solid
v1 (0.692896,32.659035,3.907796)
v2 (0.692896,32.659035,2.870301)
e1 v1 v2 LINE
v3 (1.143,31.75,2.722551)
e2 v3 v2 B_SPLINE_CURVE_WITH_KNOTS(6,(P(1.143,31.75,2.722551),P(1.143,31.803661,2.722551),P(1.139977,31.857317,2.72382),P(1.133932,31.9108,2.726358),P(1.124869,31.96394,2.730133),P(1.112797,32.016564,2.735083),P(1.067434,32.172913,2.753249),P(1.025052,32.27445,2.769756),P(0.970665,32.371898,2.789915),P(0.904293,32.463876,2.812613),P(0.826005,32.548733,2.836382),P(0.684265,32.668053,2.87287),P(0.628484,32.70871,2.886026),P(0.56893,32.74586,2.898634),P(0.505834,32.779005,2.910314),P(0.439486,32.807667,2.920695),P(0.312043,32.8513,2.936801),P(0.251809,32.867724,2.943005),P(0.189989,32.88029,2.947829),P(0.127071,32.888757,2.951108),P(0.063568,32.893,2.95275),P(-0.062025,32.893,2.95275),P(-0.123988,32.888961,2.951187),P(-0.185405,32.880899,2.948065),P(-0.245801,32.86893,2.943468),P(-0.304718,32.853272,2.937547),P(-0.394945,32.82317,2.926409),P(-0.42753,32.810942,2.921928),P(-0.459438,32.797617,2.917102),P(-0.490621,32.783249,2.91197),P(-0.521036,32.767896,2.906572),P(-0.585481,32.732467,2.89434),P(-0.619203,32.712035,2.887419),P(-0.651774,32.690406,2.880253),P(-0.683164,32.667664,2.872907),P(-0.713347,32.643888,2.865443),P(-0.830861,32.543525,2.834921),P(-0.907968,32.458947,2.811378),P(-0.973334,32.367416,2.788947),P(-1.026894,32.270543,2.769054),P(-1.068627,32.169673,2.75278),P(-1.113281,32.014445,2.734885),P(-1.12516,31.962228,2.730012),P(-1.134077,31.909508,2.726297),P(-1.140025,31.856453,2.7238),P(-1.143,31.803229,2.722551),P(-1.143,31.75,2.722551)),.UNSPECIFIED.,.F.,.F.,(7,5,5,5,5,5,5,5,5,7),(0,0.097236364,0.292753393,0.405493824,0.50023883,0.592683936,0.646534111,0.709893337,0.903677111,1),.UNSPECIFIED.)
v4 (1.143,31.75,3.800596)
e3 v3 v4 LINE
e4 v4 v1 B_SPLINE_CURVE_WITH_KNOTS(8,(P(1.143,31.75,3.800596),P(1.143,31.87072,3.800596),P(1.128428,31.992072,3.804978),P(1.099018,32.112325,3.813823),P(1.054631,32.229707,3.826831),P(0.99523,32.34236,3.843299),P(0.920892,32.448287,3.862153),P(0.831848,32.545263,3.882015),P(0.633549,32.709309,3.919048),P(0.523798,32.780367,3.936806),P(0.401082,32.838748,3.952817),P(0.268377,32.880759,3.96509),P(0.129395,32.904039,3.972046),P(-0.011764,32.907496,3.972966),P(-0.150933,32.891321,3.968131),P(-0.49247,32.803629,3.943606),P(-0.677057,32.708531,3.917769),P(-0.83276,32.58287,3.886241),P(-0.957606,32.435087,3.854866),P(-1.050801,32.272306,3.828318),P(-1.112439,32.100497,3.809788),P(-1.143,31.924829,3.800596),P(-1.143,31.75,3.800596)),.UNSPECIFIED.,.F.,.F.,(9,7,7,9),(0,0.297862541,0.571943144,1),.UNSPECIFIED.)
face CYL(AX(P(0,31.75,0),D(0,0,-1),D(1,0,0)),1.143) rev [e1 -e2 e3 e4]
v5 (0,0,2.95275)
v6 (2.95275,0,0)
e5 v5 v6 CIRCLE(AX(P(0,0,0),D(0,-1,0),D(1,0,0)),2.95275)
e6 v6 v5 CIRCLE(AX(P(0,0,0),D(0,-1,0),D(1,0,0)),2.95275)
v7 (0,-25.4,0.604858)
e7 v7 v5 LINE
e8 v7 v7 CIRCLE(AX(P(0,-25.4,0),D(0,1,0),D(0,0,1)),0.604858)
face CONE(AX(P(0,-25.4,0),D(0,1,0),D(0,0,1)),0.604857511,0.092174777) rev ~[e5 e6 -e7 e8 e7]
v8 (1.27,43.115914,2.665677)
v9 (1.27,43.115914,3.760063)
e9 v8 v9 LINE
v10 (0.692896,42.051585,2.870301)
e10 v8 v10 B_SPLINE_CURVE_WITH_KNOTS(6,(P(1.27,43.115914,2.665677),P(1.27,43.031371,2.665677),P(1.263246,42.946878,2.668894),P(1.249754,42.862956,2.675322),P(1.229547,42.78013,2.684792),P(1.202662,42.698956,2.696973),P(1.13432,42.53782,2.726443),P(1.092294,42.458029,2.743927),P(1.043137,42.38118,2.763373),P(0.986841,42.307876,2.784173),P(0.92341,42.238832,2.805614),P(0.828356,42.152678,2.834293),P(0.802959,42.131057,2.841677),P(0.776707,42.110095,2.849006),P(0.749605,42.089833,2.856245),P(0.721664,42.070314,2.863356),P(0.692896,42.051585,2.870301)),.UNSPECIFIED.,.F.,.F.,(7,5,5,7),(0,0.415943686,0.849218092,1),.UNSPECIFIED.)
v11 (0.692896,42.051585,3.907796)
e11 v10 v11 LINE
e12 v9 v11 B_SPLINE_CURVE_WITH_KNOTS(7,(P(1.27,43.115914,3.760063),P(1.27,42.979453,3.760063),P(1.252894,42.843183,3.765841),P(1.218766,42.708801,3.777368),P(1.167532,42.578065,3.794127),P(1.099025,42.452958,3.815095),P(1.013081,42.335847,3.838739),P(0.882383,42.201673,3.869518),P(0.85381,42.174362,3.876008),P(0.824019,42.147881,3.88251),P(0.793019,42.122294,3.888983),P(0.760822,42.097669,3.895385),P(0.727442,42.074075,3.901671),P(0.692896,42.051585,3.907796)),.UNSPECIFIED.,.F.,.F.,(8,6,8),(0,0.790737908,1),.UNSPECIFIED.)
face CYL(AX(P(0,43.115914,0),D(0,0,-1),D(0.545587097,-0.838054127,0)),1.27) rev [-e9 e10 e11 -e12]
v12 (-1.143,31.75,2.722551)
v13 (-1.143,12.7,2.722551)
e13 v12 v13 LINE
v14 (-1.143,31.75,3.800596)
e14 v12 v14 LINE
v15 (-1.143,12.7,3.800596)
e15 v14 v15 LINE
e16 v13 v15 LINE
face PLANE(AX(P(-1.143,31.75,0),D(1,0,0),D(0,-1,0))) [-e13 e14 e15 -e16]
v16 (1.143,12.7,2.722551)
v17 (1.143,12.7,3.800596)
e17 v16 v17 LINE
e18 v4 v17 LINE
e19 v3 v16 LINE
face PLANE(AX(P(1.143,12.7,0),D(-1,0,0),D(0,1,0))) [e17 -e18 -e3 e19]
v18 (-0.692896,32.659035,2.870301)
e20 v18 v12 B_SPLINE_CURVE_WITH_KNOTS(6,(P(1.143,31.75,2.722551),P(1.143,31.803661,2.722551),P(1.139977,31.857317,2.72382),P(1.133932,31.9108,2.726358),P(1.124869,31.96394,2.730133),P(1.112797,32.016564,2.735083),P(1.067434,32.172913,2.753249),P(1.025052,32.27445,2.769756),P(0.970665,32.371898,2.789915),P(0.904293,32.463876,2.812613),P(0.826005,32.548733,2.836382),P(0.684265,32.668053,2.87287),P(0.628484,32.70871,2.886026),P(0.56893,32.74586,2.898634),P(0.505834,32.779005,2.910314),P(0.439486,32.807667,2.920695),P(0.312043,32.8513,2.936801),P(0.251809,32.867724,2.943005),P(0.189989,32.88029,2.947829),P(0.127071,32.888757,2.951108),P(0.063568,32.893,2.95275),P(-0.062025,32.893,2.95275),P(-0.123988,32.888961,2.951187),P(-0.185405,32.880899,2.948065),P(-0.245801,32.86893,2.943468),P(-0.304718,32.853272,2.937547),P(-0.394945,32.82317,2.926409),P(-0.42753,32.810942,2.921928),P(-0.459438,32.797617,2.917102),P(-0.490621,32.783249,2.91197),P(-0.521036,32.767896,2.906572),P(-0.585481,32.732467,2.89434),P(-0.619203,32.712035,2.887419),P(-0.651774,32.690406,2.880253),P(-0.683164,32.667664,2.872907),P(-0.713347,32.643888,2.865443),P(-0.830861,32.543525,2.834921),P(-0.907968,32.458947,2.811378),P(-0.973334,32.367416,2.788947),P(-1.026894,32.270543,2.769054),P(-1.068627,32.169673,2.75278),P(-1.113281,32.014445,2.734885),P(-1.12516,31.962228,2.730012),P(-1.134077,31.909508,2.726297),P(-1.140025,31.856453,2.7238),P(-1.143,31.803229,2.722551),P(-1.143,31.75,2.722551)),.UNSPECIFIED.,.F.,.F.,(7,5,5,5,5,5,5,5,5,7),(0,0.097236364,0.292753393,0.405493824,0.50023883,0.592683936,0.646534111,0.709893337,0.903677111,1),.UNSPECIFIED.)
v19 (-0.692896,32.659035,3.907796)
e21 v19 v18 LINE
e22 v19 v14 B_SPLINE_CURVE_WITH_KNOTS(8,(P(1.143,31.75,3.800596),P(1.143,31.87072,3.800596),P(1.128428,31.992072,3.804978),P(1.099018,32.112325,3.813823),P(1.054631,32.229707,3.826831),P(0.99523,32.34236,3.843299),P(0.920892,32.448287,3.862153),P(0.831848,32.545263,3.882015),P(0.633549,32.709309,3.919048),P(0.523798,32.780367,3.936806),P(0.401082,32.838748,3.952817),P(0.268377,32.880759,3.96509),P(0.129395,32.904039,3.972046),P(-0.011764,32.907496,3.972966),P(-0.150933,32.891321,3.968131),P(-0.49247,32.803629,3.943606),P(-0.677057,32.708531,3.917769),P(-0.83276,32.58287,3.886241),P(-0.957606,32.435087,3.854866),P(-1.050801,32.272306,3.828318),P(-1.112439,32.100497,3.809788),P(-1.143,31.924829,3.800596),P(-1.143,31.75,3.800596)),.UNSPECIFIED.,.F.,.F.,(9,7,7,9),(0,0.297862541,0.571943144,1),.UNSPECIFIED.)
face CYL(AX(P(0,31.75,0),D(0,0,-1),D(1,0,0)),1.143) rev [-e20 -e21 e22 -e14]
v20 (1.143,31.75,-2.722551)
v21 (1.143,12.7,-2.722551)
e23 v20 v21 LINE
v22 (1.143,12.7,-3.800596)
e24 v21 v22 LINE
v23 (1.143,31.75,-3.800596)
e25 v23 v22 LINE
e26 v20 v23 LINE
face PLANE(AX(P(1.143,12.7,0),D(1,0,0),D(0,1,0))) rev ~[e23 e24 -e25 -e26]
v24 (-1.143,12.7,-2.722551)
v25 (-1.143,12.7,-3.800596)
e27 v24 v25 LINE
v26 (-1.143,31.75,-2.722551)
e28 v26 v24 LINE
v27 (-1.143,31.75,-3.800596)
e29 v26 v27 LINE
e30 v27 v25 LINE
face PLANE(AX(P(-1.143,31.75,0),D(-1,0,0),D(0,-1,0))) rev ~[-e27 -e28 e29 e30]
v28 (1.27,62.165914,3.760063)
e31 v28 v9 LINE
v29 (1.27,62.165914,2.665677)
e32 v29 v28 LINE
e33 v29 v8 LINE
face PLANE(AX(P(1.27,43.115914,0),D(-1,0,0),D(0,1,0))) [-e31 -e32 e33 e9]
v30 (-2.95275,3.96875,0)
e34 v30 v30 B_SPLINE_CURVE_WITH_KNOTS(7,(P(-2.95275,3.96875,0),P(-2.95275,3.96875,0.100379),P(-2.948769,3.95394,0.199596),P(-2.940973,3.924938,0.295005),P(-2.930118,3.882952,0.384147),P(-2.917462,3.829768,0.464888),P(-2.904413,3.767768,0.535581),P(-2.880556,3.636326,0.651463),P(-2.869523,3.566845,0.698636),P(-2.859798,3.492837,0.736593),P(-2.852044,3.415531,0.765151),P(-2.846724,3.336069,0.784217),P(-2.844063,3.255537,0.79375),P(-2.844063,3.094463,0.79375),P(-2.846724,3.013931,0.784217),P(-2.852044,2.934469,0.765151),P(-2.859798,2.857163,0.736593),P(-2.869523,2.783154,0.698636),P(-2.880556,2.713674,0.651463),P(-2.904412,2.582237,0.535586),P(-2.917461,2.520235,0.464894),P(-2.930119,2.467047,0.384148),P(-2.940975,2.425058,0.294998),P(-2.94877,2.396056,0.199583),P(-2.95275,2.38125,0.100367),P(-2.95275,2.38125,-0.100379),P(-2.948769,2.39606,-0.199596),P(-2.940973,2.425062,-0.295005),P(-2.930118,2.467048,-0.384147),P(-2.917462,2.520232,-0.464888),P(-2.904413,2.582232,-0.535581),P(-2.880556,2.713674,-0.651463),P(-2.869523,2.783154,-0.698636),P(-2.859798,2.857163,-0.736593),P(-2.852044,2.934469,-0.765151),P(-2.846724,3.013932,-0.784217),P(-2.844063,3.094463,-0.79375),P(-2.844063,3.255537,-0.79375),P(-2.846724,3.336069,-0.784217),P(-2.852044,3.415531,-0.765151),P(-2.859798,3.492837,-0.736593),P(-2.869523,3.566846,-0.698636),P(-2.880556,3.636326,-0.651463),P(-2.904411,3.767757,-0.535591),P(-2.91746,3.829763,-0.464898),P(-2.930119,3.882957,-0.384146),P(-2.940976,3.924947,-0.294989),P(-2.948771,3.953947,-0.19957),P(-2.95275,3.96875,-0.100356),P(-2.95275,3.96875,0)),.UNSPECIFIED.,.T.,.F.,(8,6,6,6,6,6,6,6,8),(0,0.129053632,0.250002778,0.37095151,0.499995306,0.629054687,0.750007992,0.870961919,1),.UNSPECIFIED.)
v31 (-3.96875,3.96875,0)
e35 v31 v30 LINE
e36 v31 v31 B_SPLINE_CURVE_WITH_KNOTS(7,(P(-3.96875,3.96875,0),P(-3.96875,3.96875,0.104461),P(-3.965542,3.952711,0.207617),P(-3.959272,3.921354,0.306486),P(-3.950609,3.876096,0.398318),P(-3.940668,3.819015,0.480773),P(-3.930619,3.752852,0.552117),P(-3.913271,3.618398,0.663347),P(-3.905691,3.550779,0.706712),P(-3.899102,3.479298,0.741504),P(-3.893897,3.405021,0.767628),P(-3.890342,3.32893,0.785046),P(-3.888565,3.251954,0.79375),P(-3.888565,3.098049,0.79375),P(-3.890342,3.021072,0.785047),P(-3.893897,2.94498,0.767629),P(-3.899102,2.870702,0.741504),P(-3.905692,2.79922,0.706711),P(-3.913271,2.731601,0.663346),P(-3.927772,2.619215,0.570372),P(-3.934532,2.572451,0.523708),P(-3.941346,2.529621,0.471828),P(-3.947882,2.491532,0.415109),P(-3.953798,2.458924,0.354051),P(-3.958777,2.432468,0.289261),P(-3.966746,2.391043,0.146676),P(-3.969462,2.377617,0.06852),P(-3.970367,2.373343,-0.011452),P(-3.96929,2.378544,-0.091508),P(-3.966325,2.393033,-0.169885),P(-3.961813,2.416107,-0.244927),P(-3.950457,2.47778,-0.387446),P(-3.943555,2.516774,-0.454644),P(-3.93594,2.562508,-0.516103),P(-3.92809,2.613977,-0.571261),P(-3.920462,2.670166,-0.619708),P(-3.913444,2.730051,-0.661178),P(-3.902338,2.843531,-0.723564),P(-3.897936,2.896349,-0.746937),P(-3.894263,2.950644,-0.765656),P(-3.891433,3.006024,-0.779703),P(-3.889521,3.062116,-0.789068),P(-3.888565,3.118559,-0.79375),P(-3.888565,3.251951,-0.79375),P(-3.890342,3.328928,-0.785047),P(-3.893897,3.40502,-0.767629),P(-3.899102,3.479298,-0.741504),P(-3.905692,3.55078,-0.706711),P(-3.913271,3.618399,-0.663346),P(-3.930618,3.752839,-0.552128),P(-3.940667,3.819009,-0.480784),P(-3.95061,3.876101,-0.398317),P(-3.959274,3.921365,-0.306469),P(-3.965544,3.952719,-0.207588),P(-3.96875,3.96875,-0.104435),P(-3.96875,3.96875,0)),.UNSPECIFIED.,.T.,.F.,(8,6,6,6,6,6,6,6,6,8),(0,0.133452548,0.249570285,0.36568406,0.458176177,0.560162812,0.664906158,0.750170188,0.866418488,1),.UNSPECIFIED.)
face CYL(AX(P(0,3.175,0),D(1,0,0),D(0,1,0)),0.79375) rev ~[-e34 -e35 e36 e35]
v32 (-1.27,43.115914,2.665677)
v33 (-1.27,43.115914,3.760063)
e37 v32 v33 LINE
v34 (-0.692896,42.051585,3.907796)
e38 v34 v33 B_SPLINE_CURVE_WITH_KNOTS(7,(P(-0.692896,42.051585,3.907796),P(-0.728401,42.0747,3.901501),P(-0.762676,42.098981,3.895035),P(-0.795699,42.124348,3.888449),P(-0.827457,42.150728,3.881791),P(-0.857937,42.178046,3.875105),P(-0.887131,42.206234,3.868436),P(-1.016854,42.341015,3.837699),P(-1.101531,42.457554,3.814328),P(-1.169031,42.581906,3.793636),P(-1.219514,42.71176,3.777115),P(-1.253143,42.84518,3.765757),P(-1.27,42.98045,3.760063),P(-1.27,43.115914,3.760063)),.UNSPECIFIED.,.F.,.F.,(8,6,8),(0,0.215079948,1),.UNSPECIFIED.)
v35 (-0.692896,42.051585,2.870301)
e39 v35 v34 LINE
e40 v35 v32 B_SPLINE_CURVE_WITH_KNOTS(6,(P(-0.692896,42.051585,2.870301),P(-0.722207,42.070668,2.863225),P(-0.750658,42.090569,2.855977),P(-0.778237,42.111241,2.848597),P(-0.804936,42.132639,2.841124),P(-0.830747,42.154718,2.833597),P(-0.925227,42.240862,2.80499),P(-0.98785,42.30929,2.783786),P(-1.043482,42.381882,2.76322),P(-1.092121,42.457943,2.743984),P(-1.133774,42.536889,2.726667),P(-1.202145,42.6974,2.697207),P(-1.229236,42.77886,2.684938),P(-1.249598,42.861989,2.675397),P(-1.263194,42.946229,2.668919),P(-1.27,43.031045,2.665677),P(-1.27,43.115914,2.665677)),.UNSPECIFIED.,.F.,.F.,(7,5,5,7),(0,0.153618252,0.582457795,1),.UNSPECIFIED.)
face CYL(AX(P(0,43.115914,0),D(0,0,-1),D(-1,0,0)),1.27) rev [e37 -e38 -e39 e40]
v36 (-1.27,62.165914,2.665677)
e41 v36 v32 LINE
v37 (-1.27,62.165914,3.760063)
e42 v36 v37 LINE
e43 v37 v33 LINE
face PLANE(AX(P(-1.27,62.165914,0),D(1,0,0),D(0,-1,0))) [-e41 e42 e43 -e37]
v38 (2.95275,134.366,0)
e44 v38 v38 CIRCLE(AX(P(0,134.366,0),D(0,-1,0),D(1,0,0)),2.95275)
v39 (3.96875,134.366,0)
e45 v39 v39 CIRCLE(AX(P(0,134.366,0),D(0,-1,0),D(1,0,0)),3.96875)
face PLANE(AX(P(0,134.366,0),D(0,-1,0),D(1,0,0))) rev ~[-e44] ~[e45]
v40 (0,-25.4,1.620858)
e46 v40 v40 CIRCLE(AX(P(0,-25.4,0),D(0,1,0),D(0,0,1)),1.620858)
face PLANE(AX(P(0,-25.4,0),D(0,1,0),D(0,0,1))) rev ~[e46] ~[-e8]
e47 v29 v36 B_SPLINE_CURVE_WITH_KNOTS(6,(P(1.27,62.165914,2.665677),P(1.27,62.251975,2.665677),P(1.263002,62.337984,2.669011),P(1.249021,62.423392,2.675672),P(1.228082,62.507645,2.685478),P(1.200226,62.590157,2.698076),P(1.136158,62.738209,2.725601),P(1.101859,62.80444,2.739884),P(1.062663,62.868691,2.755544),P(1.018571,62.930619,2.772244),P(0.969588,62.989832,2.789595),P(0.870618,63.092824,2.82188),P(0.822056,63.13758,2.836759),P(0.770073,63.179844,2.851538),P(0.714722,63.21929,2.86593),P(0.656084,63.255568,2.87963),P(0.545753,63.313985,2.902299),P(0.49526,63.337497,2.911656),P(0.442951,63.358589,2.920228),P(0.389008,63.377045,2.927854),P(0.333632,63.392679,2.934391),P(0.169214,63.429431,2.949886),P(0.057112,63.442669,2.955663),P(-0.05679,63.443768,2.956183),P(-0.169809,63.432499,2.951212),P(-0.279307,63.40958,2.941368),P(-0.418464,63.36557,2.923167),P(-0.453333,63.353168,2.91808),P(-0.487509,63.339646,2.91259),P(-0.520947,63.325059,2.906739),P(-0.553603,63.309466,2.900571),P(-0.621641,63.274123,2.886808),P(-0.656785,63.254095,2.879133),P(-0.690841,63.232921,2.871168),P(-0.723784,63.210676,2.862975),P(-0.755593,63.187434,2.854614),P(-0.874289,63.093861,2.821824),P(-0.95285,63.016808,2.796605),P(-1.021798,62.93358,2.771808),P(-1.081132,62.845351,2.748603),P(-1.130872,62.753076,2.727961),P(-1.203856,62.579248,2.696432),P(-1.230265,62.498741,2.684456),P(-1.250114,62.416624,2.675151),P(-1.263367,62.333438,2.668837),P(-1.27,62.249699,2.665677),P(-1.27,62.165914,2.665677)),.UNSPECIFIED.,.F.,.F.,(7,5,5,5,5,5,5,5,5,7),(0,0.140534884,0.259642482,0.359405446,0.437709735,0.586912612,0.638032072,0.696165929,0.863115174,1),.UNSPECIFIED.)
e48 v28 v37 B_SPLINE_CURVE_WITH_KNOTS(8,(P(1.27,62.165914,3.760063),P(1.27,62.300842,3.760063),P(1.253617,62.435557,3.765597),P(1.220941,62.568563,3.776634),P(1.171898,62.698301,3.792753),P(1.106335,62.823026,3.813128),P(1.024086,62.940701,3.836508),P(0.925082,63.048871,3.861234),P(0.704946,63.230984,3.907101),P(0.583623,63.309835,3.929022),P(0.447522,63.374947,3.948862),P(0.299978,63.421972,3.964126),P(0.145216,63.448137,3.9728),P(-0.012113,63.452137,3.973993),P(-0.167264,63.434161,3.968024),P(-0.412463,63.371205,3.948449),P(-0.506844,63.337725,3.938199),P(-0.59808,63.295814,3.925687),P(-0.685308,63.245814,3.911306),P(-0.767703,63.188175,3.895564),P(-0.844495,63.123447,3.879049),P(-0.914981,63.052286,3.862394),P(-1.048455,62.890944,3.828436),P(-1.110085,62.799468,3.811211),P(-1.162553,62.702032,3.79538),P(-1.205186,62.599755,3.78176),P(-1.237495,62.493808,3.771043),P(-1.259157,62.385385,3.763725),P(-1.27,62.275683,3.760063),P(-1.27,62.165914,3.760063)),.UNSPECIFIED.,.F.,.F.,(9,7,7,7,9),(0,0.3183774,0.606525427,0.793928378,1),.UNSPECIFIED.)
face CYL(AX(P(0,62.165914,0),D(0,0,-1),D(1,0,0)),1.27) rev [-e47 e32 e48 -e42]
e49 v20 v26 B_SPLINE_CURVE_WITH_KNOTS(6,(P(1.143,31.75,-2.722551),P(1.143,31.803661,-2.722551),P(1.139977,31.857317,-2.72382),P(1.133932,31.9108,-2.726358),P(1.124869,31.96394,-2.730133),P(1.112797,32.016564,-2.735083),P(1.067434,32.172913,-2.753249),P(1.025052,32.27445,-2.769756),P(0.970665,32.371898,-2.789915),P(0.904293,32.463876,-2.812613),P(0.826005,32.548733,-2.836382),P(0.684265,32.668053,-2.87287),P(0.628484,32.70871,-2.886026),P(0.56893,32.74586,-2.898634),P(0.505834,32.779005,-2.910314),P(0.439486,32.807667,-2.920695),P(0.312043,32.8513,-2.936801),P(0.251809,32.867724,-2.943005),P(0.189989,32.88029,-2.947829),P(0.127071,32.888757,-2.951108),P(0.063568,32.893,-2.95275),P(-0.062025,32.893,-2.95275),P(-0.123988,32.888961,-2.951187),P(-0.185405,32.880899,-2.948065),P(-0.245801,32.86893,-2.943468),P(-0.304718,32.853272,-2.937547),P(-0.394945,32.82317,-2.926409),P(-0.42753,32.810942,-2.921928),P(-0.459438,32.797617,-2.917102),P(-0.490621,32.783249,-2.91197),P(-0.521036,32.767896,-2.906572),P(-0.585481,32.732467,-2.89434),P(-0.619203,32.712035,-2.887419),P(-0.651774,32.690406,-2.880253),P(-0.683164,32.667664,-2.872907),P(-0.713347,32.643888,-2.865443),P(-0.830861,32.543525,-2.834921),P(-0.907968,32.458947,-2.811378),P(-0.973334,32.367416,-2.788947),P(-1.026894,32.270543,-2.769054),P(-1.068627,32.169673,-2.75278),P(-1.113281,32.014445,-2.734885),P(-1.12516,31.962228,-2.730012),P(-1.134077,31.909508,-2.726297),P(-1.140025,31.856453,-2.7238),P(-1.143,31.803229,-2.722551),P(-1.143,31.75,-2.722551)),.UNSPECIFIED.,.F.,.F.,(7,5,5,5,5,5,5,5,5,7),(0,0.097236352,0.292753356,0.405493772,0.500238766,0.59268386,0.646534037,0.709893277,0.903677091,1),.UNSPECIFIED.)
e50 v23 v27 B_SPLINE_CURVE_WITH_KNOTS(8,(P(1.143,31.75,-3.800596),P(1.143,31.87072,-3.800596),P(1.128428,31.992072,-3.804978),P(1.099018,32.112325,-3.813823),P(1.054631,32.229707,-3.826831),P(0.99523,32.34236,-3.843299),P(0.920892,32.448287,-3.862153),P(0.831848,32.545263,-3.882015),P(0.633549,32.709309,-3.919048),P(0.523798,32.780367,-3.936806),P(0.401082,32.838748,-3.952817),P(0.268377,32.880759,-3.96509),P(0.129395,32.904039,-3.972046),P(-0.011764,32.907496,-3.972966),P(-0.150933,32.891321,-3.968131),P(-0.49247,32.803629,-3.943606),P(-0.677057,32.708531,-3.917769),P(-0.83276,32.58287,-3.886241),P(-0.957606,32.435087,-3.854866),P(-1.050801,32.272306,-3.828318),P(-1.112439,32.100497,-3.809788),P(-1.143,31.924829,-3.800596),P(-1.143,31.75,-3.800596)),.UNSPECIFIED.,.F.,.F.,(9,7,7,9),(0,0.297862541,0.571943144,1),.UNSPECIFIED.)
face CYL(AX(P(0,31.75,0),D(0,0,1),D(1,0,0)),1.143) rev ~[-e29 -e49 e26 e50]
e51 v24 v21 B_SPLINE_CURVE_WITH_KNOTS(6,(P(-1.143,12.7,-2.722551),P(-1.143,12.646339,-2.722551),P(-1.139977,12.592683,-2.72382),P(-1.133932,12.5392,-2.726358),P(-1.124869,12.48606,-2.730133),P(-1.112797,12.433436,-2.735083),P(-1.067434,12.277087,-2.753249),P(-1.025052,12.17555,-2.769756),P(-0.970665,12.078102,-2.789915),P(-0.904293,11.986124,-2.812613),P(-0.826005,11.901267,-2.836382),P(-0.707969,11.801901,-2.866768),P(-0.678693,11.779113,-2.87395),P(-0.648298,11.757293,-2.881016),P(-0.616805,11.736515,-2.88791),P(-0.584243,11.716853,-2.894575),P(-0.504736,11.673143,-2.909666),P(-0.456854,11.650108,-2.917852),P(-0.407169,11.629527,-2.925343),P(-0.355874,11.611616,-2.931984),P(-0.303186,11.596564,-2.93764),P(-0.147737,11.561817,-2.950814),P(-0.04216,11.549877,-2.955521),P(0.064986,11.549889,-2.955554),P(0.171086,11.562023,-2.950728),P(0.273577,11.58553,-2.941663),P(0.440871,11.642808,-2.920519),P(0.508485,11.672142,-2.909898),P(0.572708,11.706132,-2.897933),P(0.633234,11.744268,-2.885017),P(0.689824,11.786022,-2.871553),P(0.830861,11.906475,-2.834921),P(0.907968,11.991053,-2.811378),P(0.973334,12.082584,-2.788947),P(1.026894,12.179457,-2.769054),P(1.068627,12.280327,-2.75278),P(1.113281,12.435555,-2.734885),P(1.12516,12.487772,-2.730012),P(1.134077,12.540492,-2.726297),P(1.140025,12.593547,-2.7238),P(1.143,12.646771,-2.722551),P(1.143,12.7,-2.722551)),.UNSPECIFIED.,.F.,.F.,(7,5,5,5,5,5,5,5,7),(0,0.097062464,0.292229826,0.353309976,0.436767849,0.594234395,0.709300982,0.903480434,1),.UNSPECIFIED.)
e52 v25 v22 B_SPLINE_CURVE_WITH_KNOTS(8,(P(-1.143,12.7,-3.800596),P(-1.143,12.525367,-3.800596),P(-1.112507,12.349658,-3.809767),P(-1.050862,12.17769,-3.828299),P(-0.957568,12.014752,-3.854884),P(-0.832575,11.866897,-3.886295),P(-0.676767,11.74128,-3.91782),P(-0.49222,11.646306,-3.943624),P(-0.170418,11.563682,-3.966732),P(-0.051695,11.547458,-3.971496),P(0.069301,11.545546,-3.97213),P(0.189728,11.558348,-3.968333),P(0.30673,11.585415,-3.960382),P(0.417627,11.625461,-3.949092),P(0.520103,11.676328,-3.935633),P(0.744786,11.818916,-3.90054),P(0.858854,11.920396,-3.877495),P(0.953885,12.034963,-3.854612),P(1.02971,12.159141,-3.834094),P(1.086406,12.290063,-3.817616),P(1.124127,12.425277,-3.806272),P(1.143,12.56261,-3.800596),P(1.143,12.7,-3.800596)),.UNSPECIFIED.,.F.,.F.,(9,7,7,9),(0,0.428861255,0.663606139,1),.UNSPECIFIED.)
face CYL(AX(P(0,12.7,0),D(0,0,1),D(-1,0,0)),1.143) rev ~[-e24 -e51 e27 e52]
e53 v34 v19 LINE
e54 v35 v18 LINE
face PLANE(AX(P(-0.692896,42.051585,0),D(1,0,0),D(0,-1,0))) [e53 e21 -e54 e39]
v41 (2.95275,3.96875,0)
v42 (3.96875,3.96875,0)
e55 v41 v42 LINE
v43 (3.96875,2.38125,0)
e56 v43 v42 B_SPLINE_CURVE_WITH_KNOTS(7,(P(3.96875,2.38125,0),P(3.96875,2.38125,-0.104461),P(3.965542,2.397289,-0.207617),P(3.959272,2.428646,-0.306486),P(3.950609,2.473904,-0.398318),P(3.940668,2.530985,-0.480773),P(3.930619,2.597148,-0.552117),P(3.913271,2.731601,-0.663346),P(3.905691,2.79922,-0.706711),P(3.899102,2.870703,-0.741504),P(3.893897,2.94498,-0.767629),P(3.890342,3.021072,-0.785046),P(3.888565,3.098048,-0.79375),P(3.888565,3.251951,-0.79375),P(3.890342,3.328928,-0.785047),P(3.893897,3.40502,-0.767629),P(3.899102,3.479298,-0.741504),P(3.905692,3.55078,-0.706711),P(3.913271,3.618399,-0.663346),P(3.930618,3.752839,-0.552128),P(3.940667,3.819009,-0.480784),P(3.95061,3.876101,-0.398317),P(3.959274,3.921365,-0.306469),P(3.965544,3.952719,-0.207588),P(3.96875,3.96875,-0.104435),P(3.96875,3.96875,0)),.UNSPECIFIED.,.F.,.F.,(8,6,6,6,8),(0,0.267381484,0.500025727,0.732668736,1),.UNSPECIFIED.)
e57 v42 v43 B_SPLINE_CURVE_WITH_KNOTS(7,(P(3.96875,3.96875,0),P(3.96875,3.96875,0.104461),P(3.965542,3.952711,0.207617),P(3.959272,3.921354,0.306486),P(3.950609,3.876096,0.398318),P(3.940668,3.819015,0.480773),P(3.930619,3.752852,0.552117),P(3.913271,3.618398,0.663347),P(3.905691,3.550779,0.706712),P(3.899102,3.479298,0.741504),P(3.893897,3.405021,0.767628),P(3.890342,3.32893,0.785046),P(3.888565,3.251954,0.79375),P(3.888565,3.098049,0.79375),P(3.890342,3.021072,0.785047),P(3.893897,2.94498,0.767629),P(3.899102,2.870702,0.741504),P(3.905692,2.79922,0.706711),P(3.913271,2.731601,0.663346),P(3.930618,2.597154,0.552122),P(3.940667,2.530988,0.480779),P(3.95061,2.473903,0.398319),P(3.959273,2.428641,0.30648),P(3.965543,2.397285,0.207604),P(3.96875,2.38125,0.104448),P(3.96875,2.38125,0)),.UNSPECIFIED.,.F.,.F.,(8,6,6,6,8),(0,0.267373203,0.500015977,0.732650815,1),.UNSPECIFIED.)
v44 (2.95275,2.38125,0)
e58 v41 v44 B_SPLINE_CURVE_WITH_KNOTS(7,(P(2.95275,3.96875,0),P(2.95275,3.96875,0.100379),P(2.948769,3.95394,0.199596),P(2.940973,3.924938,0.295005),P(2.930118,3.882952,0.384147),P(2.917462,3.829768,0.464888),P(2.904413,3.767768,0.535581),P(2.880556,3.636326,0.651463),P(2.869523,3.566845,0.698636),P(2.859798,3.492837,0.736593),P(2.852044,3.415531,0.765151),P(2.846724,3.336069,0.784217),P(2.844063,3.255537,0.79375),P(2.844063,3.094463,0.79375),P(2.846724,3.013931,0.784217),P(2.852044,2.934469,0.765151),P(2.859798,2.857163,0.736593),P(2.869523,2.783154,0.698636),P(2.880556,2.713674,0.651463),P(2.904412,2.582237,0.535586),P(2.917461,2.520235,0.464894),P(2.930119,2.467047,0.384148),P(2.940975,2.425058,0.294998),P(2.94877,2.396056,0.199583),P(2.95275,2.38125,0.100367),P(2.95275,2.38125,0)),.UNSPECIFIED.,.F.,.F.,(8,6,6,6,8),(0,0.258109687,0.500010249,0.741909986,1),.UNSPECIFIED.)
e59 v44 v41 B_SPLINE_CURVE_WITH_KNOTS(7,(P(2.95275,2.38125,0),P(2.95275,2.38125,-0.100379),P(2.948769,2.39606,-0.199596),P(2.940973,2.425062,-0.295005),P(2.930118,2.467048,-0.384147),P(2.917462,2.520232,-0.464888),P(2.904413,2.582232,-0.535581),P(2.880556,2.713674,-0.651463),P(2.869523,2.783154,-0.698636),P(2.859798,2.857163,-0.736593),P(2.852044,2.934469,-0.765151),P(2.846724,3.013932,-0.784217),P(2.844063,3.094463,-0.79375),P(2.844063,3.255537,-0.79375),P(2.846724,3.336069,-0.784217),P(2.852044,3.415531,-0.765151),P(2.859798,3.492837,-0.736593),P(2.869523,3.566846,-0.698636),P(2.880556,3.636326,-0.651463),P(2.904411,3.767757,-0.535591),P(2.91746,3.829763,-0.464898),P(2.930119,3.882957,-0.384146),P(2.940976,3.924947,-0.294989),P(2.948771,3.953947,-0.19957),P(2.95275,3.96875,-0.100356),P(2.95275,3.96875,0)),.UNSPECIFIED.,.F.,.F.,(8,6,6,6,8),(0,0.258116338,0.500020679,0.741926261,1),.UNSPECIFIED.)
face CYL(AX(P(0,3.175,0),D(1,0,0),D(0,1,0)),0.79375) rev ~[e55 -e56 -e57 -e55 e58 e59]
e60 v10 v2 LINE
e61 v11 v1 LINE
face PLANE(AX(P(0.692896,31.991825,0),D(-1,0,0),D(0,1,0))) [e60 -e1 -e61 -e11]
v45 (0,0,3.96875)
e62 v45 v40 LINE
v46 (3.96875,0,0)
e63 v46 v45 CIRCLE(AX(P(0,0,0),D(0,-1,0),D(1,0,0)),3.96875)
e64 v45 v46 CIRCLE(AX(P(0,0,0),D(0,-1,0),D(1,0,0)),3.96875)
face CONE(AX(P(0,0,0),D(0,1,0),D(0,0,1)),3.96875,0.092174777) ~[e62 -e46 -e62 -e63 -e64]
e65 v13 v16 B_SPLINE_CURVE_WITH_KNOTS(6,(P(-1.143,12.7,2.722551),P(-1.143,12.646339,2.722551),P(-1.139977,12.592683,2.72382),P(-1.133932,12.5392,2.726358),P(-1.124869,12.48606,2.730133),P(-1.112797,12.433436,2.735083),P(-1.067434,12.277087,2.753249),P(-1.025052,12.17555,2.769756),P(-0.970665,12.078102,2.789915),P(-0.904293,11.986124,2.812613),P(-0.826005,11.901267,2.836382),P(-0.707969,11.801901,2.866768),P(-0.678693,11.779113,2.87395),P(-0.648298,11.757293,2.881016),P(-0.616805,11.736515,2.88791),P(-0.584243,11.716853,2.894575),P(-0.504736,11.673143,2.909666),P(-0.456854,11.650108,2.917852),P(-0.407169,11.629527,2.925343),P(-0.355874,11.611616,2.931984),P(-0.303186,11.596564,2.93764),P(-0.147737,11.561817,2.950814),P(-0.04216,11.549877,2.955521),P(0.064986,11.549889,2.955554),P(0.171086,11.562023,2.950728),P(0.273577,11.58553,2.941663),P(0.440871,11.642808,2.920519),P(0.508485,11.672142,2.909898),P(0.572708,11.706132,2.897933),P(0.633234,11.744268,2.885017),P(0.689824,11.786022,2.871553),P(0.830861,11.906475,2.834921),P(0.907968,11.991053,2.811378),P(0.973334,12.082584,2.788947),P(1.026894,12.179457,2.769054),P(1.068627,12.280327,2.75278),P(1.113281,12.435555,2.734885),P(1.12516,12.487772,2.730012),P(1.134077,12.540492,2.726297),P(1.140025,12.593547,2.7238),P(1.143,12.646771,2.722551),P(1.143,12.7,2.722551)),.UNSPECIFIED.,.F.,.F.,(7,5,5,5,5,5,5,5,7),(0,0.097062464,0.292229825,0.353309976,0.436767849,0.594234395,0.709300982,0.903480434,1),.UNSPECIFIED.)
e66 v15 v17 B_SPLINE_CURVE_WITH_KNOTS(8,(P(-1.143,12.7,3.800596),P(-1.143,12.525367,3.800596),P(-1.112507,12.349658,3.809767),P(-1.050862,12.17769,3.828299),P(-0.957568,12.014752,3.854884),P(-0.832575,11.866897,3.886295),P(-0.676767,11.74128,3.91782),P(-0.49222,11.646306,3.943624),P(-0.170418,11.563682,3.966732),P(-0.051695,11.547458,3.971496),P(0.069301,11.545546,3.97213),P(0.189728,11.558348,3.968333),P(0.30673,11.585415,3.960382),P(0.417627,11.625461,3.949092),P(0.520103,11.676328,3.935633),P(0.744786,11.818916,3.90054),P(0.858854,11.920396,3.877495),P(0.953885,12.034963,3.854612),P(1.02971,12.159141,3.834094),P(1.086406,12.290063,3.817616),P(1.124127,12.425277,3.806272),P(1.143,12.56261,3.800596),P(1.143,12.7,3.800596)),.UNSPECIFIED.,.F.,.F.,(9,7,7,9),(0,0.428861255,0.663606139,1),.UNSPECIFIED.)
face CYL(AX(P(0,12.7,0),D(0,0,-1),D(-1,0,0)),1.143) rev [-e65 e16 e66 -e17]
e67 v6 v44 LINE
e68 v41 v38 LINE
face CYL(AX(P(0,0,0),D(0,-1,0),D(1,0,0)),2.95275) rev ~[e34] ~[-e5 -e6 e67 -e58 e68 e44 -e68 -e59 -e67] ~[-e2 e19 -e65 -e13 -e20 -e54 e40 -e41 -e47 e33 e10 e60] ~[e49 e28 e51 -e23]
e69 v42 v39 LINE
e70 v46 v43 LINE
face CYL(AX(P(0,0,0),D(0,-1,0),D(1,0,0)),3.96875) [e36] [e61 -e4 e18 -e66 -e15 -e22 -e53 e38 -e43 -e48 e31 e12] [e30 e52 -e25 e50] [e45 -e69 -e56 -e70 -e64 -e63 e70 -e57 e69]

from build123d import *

# Parameters (mm, degrees)
F0_R          = 3.96875
F0_R_2        = 2.95275
F1_DEPTH      = 134.366
F3_DEPTH      = 3.96975
F3_DEPTH_BACK = 3.96975
F7_R          = 0.79375
F8_DEPTH      = 12.7
F9_DEPTH      = 3.9697501215


# Not quite as in the source:
# - the program builds the solid bodies; features that only make, move or delete a surface that nothing else refers to are left out


with BuildPart() as f1:
    # F0 (on Front) → F1 (new body)
    with BuildSketch(Plane.XZ):
        Circle(F0_R)
        Circle(F0_R_2, mode=Mode.SUBTRACT)
    extrude(amount=-F1_DEPTH)

    # F2 (on Top) → F3 (cut, two sides)
    with BuildSketch(Plane.XY) as f3_sk:
        with BuildLine():
            ThreePointArc((1.143, 31.75), (0, 32.893), (-1.143, 31.75))
            Line((-1.143, 31.75), (-1.143, 12.7))
            ThreePointArc((-1.143, 12.7), (0, 11.557), (1.143, 12.7))
            Line((1.143, 12.7), (1.143, 31.75))
        make_face()
    extrude(amount=F3_DEPTH, mode=Mode.SUBTRACT)
    extrude(f3_sk.sketch, amount=-F3_DEPTH_BACK, mode=Mode.SUBTRACT)

    # F5 (on Right) → F6 (revolve)
    with BuildSketch(Plane.YZ):
        Polygon((0, 3.96875), (-25.4, 1.6208575107), (-25.4, 0.6048575107), (0, 2.95275), align=None)
    revolve(axis=Axis((0, -12.7, 0), (0, 1, 0)))

    # F7 (on Right) → F8 (cut, symmetric)
    with BuildSketch(Plane.YZ):
        with Locations((3.175, 0)):
            Circle(F7_R)
    extrude(amount=F8_DEPTH, both=True, mode=Mode.SUBTRACT)

    # F4 (on Top) → F9 (cut, through all)
    with BuildSketch(Plane.XY):
        with BuildLine():
            ThreePointArc((1.27, 62.165913868), (0, 63.435913868), (-1.27, 62.165913868))
            Line((-1.27, 62.165913868), (-1.27, 43.115913868))
            ThreePointArc((-1.27, 43.115913868), (-1.1164401975, 42.5105534089), (-0.6928956136, 42.0515851271))
            Line((-0.6928956136, 42.0515851271), (-0.6928956136, 31.9918245077))
            Line((-0.6928956136, 31.9918245077), (0.6928956136, 31.9918245077))
            Line((0.6928956136, 31.9918245077), (0.6928956136, 42.0515851271))
            ThreePointArc((0.6928956136, 42.0515851271), (1.1164401975, 42.5105534089), (1.27, 43.115913868))
            Line((1.27, 43.115913868), (1.27, 62.165913868))
        make_face()
    extrude(amount=F9_DEPTH, mode=Mode.SUBTRACT)


solid = f1.part
